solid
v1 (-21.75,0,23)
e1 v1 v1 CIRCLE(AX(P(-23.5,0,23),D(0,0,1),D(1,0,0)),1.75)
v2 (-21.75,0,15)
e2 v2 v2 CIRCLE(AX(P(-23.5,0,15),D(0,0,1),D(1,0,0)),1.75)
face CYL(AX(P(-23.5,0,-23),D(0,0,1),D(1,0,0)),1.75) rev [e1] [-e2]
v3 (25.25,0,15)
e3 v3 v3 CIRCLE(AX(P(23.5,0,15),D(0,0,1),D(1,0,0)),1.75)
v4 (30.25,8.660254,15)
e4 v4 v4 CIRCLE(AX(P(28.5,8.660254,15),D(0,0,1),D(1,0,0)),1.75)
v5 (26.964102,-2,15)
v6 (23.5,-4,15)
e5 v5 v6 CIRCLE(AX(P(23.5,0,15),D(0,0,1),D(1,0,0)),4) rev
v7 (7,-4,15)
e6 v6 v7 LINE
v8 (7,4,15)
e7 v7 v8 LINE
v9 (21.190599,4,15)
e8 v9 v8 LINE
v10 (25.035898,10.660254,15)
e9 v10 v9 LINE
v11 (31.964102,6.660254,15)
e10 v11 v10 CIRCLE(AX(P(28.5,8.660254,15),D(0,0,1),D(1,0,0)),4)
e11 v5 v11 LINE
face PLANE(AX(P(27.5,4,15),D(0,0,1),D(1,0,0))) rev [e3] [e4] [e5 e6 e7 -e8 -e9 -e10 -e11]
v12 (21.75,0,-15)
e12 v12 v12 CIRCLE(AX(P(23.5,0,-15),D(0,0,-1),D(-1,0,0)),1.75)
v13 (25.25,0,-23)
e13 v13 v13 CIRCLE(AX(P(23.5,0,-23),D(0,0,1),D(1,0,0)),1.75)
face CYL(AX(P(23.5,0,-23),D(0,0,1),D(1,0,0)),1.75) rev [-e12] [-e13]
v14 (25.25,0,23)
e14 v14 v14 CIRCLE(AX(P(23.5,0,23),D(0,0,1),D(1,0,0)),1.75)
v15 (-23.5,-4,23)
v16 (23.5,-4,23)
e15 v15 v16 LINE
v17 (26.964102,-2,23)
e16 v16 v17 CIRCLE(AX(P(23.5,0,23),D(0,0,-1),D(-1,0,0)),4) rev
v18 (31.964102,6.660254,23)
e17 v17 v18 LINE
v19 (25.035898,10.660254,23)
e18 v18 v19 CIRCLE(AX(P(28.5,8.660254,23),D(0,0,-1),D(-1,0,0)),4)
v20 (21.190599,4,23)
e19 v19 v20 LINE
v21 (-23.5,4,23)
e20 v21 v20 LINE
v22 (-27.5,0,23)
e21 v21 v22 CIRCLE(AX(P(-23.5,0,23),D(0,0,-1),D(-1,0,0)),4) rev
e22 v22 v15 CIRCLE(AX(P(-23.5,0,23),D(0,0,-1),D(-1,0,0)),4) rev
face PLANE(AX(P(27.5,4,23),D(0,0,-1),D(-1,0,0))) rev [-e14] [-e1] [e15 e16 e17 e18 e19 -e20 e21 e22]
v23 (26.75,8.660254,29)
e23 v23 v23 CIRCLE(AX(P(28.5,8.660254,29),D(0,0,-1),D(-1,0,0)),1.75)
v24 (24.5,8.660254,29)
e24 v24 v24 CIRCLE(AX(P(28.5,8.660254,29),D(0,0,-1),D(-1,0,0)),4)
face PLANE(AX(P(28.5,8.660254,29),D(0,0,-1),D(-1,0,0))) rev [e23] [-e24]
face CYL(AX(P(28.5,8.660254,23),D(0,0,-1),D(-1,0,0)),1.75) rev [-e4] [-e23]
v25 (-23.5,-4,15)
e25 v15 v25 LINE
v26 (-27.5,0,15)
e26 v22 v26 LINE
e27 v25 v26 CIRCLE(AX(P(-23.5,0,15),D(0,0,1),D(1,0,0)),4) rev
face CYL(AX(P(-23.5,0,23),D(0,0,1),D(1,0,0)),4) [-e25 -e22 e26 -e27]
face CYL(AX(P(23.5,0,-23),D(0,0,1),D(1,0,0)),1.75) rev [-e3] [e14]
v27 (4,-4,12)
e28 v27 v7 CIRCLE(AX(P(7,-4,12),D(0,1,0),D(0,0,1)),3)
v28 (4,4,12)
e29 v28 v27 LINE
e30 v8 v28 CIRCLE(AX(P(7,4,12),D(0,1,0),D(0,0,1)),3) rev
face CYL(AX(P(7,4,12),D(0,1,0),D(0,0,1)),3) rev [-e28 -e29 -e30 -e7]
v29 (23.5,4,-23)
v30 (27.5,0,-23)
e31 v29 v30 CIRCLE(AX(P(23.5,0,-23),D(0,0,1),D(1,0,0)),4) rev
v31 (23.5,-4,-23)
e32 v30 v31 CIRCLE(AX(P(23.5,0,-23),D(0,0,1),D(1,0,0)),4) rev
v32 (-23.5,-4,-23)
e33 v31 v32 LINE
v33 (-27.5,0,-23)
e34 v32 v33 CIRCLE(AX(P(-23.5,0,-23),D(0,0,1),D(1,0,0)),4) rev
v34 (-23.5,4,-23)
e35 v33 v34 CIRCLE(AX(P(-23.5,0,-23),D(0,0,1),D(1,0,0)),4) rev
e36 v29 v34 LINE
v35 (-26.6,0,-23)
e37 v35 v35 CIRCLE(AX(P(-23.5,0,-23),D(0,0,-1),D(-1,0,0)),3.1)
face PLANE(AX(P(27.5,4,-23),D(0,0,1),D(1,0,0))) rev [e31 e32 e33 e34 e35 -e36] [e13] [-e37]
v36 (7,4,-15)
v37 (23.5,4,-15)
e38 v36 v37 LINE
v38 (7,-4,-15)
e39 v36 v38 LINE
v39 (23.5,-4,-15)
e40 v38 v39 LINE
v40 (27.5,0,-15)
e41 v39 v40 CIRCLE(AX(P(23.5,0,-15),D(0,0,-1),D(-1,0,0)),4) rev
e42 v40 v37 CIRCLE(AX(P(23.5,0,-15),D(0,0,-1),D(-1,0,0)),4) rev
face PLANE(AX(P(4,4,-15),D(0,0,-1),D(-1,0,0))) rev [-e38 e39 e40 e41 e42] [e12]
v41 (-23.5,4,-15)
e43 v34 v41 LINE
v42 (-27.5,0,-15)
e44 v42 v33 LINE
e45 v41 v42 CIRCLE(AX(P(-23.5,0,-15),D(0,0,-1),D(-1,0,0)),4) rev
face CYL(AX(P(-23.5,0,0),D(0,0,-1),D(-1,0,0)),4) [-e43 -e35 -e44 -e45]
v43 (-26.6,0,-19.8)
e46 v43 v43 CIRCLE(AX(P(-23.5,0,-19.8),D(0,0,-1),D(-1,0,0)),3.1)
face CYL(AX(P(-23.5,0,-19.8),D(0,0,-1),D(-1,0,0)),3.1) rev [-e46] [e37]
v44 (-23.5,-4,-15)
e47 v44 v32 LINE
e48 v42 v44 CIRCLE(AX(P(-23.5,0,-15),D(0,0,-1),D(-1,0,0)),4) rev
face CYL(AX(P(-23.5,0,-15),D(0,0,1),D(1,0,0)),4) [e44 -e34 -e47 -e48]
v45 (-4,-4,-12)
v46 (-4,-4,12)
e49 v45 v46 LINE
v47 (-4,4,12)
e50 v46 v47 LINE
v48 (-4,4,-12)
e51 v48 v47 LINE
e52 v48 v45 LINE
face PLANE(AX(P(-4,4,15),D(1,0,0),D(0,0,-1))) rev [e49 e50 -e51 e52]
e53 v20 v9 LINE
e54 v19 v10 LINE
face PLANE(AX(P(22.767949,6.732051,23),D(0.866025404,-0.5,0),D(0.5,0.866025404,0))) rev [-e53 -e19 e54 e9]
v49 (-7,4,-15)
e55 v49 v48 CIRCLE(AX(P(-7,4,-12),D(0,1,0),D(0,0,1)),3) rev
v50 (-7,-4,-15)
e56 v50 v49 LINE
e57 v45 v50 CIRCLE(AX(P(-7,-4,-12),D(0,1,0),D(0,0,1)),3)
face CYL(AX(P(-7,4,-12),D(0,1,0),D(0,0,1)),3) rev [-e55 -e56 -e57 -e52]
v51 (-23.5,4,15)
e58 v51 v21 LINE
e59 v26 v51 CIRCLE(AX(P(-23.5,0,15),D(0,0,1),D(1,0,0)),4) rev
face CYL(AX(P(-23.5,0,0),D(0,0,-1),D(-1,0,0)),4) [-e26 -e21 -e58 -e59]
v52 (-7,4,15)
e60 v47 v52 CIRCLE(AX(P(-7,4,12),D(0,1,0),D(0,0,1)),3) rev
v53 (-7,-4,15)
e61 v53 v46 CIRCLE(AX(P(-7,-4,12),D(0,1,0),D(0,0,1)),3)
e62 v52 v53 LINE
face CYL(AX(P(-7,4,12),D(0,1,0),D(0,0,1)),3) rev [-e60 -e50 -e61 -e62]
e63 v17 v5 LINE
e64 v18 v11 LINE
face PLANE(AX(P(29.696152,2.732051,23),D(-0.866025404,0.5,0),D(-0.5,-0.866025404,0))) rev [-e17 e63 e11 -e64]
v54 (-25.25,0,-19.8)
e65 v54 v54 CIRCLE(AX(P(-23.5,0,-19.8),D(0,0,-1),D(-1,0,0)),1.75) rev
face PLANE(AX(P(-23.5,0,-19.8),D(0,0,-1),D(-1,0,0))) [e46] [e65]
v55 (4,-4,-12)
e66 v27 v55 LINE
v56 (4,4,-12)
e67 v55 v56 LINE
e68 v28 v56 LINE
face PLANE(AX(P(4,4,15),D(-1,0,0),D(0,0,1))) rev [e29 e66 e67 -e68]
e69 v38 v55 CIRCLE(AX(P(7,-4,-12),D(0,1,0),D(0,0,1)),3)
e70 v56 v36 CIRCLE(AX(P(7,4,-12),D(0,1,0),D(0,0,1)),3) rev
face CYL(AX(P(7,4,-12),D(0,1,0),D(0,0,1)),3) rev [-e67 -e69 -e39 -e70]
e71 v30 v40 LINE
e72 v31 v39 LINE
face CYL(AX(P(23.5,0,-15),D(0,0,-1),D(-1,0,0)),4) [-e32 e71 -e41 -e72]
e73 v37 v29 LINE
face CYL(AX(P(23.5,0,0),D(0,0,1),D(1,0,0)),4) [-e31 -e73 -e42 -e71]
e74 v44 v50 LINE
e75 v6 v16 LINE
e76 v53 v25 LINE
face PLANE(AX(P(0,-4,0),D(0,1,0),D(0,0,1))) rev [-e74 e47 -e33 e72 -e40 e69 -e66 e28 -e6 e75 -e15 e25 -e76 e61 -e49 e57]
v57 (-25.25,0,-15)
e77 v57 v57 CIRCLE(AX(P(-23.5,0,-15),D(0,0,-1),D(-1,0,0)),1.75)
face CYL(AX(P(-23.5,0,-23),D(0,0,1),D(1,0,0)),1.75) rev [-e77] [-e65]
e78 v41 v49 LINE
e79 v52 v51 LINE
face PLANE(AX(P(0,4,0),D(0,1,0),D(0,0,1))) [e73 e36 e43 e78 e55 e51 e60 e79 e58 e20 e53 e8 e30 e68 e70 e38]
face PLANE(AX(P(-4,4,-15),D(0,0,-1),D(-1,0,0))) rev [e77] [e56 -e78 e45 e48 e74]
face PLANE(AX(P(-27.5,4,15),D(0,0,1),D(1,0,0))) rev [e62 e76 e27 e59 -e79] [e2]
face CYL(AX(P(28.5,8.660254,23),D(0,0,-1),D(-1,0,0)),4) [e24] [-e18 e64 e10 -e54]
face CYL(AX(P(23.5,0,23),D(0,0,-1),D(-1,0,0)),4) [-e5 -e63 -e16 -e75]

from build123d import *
from build123d.topology import SkipClean

# Parameters (mm, degrees)
SALIENTE_EXTRUIR1_DEPTH = 4
CROQUIS3_R              = 1.75
CORTAR_EXTRUIR1_DEPTH   = 54.742441329
REDONDEO8_R             = 4
REDONDEO9_R             = 3
SALIENTE_EXTRUIR3_START = -46
CROQUIS5_R              = 1.75
SALIENTE_EXTRUIR3_DEPTH = 8
SALIENTE_EXTRUIR2_START = 52
CROQUIS4_R              = 4
CROQUIS4_R_2            = 1.75
SALIENTE_EXTRUIR2_DEPTH = 6
CROQUIS6_R              = 3.1
CORTAR_EXTRUIR2_DEPTH   = 3.2


with BuildPart() as part:
    # Croquis2 → Saliente-Extruir1 (new, symmetric)
    with BuildSketch(Plane(origin=(0, 0, 0), x_dir=(1, 0, 0), z_dir=(0, 1, 0))):
        Polygon((27.5, -23), (27.5, -15), (4, -15), (4, 15), (27.5, 15), (27.5, 23), (-27.5, 23), (-27.5, 15), (-4, 15), (-4, -15), (-27.5, -15), (-27.5, -23), align=None)
    extrude(amount=SALIENTE_EXTRUIR1_DEPTH, both=True)

    # Croquis3 → Cortar-Extruir1 (cut, through all)
    with BuildSketch(Plane.XY.offset(23)):
        with Locations((23.5, 0)):
            Circle(CROQUIS3_R)
        with Locations((-23.5, 0)):
            Circle(CROQUIS3_R)
    extrude(amount=-CORTAR_EXTRUIR1_DEPTH, mode=Mode.SUBTRACT)

    # Redondeo8
    redondeo8_edges = [part.edges().sort_by_distance(p)[0] for p in [
        (27.5, -4, -19),
        (27.5, 4, -19),
        (27.5, -4, 19),
        (27.5, 4, 19),
        (-27.5, -4, -19),
        (-27.5, 4, -19),
        (-27.5, -4, 19),
        (-27.5, 4, 19),
    ]]
    fillet(redondeo8_edges, radius=REDONDEO8_R - 0.0001)  # a hair under: the kernel refuses the full size

    # Redondeo9
    redondeo9_edges = [part.edges().sort_by_distance(p)[0] for p in [
        (4, 0, -15),
        (4, 0, 15),
        (-4, 0, 15),
        (-4, 0, -15),
    ]]
    fillet(redondeo9_edges, radius=REDONDEO9_R)

    # Croquis5 → Saliente-Extruir3 (add)
    with BuildSketch(Plane(origin=(0, 0, -23), x_dir=(-1, 0, 0), z_dir=(0, 0, -1)).offset(SALIENTE_EXTRUIR3_START)):
        with BuildLine():
            Line((-25.035898385, 10.660254038), (-20.035898385, 2))
            ThreePointArc((-20.035898385, 2), (-21.5, -3.464101615), (-26.964101615, -2))
            Line((-26.964101615, -2), (-31.964101615, 6.660254038))
            ThreePointArc((-31.964101615, 6.660254038), (-30.5, 12.124355653), (-25.035898385, 10.660254038))
        make_face()
        with Locations(Location((-23.5, 0, 0), (0, 0, 180))):
            Circle(CROQUIS5_R, mode=Mode.SUBTRACT)
        with Locations(Location((-28.5, 8.660254038, 0), (0, 0, 180))):
            Circle(CROQUIS5_R, mode=Mode.SUBTRACT)
    extrude(amount=SALIENTE_EXTRUIR3_DEPTH)

    # Croquis4 → Saliente-Extruir2 (add)
    with SkipClean():  # the faces are left unmerged after this step: merging them gives an invalid solid
        with BuildSketch(Plane.XY.offset(-23).offset(SALIENTE_EXTRUIR2_START)):
            with Locations(Location((28.5, 8.660254038, 0), (0, 0, 180))):
                Circle(CROQUIS4_R)
            with Locations(Location((28.5, 8.660254038, 0), (0, 0, 180))):
                Circle(CROQUIS4_R_2, mode=Mode.SUBTRACT)
        extrude(amount=-SALIENTE_EXTRUIR2_DEPTH)

    # Croquis6 → Cortar-Extruir2 (cut)
    with SkipClean():  # the faces are left unmerged after this step: merging them gives an invalid solid
        with BuildSketch(Plane(origin=(0, 0, -23), x_dir=(-1, 0, 0), z_dir=(0, 0, -1))):
            with Locations((23.5, 0)):
                Circle(CROQUIS6_R)
        extrude(amount=-CORTAR_EXTRUIR2_DEPTH, mode=Mode.SUBTRACT)


solid = part.part
